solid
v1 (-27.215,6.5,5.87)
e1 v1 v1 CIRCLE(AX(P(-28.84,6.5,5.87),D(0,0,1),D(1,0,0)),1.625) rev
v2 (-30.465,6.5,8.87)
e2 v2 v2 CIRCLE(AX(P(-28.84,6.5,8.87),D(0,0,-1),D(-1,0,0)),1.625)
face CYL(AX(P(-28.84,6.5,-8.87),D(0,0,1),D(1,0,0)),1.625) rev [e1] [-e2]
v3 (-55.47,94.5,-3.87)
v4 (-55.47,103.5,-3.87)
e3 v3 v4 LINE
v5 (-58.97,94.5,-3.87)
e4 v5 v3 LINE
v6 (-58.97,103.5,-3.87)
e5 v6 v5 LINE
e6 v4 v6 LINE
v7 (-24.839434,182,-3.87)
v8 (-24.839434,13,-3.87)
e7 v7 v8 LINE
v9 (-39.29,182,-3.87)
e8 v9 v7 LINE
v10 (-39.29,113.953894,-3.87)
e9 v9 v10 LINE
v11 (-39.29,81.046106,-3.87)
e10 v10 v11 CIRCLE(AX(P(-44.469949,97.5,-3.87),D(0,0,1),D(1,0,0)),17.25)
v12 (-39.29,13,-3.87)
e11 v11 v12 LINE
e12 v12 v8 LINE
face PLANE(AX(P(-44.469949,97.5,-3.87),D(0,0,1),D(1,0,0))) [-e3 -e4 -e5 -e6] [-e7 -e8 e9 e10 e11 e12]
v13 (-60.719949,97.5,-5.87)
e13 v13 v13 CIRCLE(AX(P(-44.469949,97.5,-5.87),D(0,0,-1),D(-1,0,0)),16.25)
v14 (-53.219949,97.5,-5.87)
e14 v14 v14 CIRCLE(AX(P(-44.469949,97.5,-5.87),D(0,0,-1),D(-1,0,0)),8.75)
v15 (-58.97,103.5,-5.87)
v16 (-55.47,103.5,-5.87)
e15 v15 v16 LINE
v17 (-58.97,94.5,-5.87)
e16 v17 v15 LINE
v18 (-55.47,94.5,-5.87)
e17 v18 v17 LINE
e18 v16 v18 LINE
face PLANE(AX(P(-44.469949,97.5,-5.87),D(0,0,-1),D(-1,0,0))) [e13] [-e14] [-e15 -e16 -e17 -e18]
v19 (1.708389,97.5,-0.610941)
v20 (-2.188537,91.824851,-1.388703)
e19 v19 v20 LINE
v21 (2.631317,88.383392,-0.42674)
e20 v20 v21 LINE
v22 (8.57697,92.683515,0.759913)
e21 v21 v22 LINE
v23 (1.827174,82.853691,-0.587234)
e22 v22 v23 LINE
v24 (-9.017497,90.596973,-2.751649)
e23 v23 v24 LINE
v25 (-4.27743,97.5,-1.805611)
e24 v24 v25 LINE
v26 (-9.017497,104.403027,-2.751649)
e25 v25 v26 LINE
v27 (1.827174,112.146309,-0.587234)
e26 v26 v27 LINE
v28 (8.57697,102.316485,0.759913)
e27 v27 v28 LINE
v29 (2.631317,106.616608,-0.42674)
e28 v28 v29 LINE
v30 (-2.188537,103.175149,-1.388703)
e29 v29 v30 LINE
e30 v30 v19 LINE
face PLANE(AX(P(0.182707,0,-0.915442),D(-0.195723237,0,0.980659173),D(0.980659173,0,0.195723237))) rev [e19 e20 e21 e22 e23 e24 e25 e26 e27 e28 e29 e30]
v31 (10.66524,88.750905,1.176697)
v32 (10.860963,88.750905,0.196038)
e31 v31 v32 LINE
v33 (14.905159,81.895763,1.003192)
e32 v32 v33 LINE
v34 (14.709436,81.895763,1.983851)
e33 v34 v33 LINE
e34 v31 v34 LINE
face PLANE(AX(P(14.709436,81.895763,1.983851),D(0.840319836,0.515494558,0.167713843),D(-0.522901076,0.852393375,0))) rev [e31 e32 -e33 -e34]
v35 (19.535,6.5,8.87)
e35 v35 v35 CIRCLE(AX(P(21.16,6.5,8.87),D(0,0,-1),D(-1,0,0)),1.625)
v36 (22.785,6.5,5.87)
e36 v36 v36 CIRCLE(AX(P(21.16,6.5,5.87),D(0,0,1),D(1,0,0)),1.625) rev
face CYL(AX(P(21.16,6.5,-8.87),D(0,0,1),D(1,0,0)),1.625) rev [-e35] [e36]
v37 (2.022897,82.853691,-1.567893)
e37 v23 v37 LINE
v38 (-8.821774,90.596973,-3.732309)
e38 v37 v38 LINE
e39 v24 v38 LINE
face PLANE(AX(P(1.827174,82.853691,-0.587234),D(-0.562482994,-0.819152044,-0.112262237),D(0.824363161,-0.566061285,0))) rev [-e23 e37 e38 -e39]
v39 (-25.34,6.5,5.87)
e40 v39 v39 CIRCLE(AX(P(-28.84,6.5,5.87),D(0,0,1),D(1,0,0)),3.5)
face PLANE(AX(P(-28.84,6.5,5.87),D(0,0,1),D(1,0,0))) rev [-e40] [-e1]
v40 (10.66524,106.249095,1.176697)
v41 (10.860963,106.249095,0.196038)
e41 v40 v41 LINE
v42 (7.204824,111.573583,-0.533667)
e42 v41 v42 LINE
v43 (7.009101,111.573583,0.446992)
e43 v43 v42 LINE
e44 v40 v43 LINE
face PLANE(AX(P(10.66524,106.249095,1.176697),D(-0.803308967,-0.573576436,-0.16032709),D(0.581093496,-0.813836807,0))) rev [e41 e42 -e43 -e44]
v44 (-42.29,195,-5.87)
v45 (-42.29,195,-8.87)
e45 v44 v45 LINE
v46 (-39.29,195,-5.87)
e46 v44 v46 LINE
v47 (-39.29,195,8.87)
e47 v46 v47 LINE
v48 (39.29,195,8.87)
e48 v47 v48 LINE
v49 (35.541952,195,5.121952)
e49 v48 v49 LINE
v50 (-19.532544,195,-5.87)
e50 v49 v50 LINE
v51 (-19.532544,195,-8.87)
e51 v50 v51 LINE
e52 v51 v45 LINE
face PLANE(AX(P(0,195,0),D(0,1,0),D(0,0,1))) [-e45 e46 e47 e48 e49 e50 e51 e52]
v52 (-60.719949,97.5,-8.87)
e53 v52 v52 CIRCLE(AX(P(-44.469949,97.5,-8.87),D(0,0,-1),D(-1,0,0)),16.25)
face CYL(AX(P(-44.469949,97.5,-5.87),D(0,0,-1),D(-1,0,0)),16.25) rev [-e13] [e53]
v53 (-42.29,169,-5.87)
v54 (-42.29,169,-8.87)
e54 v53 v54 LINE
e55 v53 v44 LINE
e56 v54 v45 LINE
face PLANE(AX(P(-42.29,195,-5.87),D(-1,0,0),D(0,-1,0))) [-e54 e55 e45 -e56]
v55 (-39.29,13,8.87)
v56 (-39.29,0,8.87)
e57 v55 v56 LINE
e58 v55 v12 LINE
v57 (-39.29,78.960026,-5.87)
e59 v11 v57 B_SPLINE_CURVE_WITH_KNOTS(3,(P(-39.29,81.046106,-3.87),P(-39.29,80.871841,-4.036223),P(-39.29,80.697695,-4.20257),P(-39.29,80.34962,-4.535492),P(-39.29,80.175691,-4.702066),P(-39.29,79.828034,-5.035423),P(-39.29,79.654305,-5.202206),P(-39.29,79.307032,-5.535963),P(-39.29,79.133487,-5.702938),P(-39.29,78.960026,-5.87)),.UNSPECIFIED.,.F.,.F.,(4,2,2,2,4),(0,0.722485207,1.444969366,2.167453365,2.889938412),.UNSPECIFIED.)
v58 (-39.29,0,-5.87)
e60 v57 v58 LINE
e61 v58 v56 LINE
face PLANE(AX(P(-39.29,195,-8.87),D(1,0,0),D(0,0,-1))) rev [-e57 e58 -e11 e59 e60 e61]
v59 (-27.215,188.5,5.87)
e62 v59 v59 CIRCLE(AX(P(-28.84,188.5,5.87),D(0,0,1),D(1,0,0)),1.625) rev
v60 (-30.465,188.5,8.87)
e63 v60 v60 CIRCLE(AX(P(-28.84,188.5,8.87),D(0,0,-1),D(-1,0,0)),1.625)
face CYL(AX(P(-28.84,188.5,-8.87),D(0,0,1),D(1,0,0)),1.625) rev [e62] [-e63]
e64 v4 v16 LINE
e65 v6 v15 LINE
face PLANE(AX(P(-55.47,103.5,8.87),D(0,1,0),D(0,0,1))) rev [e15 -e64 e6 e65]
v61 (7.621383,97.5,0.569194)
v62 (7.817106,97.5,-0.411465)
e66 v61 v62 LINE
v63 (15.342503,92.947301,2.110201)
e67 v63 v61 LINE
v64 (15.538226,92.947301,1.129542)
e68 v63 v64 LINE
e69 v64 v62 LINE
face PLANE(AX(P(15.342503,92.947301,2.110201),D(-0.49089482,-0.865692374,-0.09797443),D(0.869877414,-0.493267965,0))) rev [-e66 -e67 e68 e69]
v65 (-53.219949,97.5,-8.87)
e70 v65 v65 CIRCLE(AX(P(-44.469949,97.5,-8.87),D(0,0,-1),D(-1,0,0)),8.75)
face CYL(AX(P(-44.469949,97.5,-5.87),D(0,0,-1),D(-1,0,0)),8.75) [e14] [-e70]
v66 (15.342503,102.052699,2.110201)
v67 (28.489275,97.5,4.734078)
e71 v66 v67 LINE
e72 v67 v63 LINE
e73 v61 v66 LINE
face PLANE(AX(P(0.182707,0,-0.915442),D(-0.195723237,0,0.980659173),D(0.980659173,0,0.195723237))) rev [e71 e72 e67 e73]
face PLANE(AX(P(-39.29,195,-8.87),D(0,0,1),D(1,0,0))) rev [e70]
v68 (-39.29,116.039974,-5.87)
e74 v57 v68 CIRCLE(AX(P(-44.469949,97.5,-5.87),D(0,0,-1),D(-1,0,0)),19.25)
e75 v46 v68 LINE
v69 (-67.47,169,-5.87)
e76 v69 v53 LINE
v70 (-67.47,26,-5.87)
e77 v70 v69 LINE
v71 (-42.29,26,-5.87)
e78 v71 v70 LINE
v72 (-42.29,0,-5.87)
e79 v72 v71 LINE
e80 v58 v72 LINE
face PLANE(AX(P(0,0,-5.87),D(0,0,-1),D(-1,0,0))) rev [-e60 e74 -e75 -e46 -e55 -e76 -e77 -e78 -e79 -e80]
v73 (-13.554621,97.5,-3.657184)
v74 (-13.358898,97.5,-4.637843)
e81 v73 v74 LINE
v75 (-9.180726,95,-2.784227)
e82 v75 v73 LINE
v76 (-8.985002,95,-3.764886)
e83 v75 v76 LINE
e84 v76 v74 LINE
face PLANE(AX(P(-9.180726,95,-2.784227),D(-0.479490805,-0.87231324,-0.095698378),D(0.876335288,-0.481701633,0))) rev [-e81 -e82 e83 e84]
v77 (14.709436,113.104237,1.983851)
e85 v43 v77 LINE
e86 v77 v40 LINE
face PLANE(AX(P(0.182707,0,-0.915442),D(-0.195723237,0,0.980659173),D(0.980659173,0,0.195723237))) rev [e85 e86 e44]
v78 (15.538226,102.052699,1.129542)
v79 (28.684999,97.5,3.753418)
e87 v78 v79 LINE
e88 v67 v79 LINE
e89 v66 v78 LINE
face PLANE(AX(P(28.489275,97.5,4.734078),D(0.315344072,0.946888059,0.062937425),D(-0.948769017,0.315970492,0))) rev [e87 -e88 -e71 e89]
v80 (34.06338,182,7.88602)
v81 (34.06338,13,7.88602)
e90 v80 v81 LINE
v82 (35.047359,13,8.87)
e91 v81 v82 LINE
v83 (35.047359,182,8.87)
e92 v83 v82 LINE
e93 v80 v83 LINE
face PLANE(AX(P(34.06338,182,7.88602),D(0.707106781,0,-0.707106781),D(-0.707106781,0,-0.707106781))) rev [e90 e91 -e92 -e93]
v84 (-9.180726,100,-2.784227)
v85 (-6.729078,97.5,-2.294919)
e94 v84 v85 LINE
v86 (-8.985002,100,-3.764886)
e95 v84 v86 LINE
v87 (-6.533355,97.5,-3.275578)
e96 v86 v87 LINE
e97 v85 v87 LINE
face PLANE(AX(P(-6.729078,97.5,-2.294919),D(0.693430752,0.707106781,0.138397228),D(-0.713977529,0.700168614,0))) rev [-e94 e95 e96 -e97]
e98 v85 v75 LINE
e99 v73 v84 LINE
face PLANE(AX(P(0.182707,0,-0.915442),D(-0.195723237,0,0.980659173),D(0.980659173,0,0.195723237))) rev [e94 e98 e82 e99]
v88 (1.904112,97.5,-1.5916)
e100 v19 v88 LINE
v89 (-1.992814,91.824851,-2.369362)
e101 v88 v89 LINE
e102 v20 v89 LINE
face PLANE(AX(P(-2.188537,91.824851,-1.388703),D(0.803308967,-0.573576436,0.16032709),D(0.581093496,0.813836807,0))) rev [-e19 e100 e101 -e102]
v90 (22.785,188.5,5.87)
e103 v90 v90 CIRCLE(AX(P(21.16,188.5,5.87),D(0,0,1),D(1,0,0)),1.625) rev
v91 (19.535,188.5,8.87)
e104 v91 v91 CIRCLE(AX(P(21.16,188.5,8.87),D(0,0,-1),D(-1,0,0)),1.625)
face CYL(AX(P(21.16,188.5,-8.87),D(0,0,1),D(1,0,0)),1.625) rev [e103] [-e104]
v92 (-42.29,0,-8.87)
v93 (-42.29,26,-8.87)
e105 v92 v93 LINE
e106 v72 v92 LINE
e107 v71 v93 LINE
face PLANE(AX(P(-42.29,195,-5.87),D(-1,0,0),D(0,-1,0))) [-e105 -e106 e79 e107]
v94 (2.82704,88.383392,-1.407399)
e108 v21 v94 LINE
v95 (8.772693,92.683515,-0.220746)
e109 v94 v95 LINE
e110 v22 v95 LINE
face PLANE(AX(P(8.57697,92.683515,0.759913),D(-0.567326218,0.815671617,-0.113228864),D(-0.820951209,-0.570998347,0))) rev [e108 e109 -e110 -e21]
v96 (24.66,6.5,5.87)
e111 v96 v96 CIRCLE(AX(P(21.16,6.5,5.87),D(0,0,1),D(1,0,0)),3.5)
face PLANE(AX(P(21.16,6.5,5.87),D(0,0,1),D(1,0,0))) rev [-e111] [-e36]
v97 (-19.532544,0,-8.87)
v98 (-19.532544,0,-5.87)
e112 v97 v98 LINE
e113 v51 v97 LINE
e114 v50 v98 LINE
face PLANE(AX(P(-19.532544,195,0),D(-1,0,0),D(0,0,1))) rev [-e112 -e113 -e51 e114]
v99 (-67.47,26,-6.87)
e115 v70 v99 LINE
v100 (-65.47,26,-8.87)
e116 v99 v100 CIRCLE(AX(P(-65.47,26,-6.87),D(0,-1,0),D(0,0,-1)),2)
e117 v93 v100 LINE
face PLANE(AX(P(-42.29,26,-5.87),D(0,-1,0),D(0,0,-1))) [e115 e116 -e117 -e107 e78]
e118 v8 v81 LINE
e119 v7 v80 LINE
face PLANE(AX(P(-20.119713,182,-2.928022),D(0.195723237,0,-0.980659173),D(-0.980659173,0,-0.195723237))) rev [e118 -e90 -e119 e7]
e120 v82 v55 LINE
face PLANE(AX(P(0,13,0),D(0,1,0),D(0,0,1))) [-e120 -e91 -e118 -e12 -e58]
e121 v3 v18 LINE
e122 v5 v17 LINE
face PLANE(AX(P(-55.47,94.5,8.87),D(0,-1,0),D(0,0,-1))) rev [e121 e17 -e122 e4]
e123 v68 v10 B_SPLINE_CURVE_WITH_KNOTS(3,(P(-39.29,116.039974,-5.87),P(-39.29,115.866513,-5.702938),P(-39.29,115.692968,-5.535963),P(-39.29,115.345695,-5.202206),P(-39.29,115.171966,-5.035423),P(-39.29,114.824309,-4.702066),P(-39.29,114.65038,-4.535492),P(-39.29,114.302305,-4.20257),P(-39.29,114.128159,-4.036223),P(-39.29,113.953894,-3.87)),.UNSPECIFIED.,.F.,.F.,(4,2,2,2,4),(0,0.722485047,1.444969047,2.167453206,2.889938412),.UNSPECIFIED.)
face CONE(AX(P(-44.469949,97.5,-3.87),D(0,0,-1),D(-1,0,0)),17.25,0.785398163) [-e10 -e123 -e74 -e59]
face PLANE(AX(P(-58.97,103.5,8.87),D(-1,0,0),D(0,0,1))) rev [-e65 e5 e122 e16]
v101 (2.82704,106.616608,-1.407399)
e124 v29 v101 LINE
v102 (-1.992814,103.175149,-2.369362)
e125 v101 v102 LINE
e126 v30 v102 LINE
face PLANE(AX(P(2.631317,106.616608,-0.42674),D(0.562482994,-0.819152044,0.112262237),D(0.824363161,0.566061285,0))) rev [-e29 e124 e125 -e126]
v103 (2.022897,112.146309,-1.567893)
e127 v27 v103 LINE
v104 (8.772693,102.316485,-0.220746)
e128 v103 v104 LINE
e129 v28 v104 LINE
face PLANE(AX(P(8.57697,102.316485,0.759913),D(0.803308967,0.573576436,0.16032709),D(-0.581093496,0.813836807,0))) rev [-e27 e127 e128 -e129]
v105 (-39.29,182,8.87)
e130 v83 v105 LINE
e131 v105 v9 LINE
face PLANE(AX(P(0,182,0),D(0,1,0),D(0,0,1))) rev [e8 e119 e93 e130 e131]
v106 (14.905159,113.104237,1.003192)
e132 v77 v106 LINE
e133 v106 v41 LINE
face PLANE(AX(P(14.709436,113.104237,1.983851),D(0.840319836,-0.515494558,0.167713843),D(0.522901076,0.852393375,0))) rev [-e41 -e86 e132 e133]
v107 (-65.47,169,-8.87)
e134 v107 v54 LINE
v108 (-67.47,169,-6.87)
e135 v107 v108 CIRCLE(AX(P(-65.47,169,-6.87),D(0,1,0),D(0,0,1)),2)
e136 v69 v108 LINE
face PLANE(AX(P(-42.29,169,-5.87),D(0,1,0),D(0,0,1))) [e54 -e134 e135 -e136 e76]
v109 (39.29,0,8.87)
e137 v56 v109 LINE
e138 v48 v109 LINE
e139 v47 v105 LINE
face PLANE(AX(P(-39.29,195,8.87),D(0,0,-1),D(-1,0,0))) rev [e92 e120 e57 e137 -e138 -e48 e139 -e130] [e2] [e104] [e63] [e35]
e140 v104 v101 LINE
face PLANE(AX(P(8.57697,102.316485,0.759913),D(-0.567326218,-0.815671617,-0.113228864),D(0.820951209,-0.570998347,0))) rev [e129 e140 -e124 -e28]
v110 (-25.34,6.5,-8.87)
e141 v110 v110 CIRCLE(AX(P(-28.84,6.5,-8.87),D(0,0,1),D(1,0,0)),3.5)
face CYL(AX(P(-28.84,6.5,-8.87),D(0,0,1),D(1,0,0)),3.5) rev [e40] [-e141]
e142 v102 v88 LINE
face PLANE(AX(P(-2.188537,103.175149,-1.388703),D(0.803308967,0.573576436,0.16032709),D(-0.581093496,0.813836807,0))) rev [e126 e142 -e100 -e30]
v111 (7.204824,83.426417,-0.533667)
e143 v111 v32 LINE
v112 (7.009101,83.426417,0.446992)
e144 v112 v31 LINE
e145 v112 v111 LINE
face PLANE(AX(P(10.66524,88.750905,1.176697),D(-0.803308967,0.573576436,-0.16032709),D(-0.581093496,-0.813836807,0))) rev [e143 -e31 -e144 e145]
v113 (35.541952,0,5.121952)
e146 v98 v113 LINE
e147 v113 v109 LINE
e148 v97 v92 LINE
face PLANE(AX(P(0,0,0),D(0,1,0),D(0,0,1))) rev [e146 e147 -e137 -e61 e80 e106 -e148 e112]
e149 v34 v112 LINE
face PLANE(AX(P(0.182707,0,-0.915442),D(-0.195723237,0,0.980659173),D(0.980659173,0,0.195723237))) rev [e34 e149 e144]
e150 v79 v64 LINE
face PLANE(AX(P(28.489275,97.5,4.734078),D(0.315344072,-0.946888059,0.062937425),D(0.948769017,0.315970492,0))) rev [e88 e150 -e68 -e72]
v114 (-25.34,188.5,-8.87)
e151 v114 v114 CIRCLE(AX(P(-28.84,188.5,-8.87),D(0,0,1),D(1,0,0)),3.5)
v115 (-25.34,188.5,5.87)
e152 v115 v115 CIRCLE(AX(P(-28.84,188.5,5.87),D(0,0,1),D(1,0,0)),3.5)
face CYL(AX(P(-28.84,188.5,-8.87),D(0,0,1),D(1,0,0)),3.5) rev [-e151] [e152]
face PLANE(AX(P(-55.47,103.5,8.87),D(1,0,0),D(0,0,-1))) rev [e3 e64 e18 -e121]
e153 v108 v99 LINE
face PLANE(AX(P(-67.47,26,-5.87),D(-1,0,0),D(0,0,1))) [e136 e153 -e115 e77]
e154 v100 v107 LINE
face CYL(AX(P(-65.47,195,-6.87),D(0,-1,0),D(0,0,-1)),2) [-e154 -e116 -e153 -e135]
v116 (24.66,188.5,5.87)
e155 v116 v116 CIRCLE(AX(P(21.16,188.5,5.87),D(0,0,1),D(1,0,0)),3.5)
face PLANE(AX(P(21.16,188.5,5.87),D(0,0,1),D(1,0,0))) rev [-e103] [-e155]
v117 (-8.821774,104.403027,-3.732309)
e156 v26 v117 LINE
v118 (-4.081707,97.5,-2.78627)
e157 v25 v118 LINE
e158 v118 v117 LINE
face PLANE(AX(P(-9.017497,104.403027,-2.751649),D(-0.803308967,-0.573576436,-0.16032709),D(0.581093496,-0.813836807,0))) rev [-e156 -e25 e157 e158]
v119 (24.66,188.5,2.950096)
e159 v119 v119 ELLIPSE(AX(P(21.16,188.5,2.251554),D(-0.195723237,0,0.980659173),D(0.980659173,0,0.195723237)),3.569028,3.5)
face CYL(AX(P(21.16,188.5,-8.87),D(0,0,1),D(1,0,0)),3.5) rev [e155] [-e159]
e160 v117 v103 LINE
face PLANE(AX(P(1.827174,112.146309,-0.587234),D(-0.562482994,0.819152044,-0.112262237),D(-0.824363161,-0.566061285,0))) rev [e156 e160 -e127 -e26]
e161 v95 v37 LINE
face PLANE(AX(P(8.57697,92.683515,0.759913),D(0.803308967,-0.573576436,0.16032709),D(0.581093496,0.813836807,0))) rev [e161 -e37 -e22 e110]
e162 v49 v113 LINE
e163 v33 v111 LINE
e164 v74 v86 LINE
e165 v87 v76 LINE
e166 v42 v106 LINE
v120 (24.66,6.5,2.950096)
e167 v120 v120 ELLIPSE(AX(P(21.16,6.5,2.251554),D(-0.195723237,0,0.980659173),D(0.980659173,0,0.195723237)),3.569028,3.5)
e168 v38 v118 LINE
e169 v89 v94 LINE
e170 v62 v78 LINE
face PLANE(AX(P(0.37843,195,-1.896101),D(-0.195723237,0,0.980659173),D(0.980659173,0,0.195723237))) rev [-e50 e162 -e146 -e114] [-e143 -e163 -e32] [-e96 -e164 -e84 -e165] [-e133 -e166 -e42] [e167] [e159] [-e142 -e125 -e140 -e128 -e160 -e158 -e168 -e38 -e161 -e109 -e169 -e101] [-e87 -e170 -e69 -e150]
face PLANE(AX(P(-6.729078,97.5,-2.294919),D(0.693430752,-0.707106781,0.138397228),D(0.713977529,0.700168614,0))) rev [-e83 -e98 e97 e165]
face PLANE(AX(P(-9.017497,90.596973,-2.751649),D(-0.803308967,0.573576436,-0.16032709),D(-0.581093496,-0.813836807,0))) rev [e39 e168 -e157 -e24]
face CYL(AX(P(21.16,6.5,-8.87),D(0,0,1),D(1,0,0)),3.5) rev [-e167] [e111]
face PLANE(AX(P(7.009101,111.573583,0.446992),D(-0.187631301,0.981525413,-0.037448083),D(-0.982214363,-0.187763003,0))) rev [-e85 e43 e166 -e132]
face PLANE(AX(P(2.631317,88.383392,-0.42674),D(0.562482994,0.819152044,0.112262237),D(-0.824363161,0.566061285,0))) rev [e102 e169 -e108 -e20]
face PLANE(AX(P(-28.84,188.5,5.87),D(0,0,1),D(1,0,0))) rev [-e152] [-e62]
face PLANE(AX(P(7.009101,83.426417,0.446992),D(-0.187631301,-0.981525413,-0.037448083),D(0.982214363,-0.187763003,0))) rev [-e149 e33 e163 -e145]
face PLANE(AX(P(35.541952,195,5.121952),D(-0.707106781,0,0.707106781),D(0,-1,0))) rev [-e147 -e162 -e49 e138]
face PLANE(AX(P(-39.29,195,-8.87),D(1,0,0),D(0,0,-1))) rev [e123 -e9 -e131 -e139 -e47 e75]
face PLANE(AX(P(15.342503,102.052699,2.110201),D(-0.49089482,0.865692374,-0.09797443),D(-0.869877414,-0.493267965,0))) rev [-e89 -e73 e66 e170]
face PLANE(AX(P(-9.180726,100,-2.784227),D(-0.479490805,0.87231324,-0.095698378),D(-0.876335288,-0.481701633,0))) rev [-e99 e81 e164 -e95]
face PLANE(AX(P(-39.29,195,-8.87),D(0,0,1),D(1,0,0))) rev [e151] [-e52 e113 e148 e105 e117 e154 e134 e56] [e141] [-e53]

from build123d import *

# Parameters (mm, degrees)
CROQUIS1_W                 = 78.58
CROQUIS1_H                 = 17.74
SALIENTE_EXTRUIR1_DEPTH    = 195
CORTAR_EXTRUIR1_DEPTH      = 200.116501074
CORTAR_EXTRUIR1_DEPTH_BACK = 200.116501074
CHAFL_N1_SIZE2             = 3.821967962
CHAFL_N1_SIZE              = 3
CROQUIS4_W                 = 3
CROQUIS4_H                 = 195
SALIENTE_EXTRUIR2_DEPTH    = 3
CROQUIS5_W                 = 25.18
CROQUIS5_H                 = 143
SALIENTE_EXTRUIR3_DEPTH    = 3
REDONDEO1_R                = 2
CORTAR_EXTRUIR2_DEPTH      = 208.103617786
CORTAR_EXTRUIR2_DEPTH_BACK = 208.103617786
CROQUIS6_R                 = 1.625
CORTAR_EXTRUIR3_START      = -3
CROQUIS7_R                 = 3.5
CORTAR_EXTRUIR3_DEPTH      = 205.103617786
CROQUIS8_R                 = 16.25
CROQUIS8_R_2               = 8.75
CORTAR_EXTRUIR4_DEPTH      = 3
CROQUIS9_R                 = 17.25
SALIENTE_EXTRUIR4_DEPTH    = 2
CHAFL_N2_SIZE              = 2
CORTAR_EXTRUIR6_DEPTH      = 208.103617786
CORTAR_EXTRUIR6_DEPTH_BACK = 208.103617786
CROQUIS10_W                = 3.5
CROQUIS10_H                = 9
CORTAR_EXTRUIR7_DEPTH      = 1
CORTAR_EXTRUIR8_START      = -13
CORTAR_EXTRUIR8_DEPTH      = 169


with BuildPart() as part:
    # Croquis1 → Saliente-Extruir1 (new body)
    with BuildSketch(Plane(origin=(0, 0, 0), x_dir=(1, 0, 0), z_dir=(0, 1, 0))):
        Rectangle(CROQUIS1_W, CROQUIS1_H)
    extrude(amount=SALIENTE_EXTRUIR1_DEPTH)

    # Croquis2 → Cortar-Extruir1 (cut, two sides: drawn at the far end of the back side and taken through both)
    with BuildSketch(Plane.XZ.offset(-CORTAR_EXTRUIR1_DEPTH_BACK)):
        Polygon((39.29, 5.87), (-19.532543769, -5.87), (-19.532543769, -8.87), (39.29, -8.87), align=None)
    extrude(amount=CORTAR_EXTRUIR1_DEPTH + CORTAR_EXTRUIR1_DEPTH_BACK, mode=Mode.SUBTRACT)

    # Chaflán1
    chafl_n1_edges = [part.edges().sort_by_distance(p)[0] for p in [
        (39.29, 97.5, 5.87),
    ]]
    chafl_n1_side = [part.faces().sort_by_distance(p)[0] for p in [
        (39.29, 97.5, 5.93),
    ]]
    chamfer(chafl_n1_edges, length=CHAFL_N1_SIZE - 0.0001, length2=CHAFL_N1_SIZE2 - 0.0001, reference=chafl_n1_side[0])  # a hair under: the kernel refuses the full size

    # Croquis4 → Saliente-Extruir2 (add)
    with BuildSketch(Plane(origin=(0, 0, -8.87), x_dir=(-1, 0, 0), z_dir=(0, 0, -1))):
        with Locations((40.79, 97.5)):
            Rectangle(CROQUIS4_W, CROQUIS4_H)
    extrude(amount=-SALIENTE_EXTRUIR2_DEPTH)

    # Croquis5 → Saliente-Extruir3 (add)
    with BuildSketch(Plane(origin=(0, 0, -8.87), x_dir=(-1, 0, 0), z_dir=(0, 0, -1))):
        with Locations((54.88, 97.5)):
            Rectangle(CROQUIS5_W, CROQUIS5_H)
    extrude(amount=-SALIENTE_EXTRUIR3_DEPTH)

    # Redondeo1
    redondeo1_edges = [part.edges().sort_by_distance(p)[0] for p in [
        (-67.47, 97.5, -8.87),
    ]]
    fillet(redondeo1_edges, radius=REDONDEO1_R)

    # Croquis6 → Cortar-Extruir2 (cut, two sides: drawn at the far end of the back side and taken through both)
    with BuildSketch(Plane.XY.offset(8.87).offset(-CORTAR_EXTRUIR2_DEPTH_BACK)):
        with Locations((-28.84, 188.5)):
            Circle(CROQUIS6_R)
        with Locations((21.16, 188.5)):
            Circle(CROQUIS6_R)
        with Locations((21.16, 6.5)):
            Circle(CROQUIS6_R)
        with Locations(Location((-28.84, 6.5, 0), (0, 0, 180))):
            Circle(CROQUIS6_R)
    extrude(amount=CORTAR_EXTRUIR2_DEPTH + CORTAR_EXTRUIR2_DEPTH_BACK, mode=Mode.SUBTRACT)

    # Croquis7 → Cortar-Extruir3 (cut, through all)
    with BuildSketch(Plane.XY.offset(8.87).offset(CORTAR_EXTRUIR3_START)):
        with Locations((-28.84, 188.5)):
            Circle(CROQUIS7_R)
        with Locations((21.16, 188.5)):
            Circle(CROQUIS7_R)
        with Locations((-28.84, 6.5)):
            Circle(CROQUIS7_R)
        with Locations((21.16, 6.5)):
            Circle(CROQUIS7_R)
    extrude(amount=-CORTAR_EXTRUIR3_DEPTH, mode=Mode.SUBTRACT)

    # Croquis8 → Cortar-Extruir4 (cut)
    with BuildSketch(Plane(origin=(0, 0, -8.87), x_dir=(-1, 0, 0), z_dir=(0, 0, -1))):
        with Locations((44.469949206, 97.5)):
            Circle(CROQUIS8_R)
        with Locations((44.469949206, 97.5)):
            Circle(CROQUIS8_R_2, mode=Mode.SUBTRACT)
    extrude(amount=-CORTAR_EXTRUIR4_DEPTH, mode=Mode.SUBTRACT)

    # Croquis9 → Saliente-Extruir4 (add)
    with BuildSketch(Plane.XY.offset(-5.87)):
        with Locations((-44.469949206, 97.5)):
            Circle(CROQUIS9_R)
    extrude(amount=SALIENTE_EXTRUIR4_DEPTH)

    # Chaflán2
    chafl_n2_edges = [part.edges().sort_by_distance(p)[0] for p in [
        (-61.719949206, 97.5, -5.87),
    ]]
    chamfer(chafl_n2_edges, length=CHAFL_N2_SIZE - 0.0001)  # a hair under: the kernel refuses the full size

    # Croquis10 → Cortar-Extruir6 (cut, two sides: drawn at the far end of the back side and taken through both)
    with BuildSketch(Plane(origin=(0, 0, -8.87), x_dir=(-1, 0, 0), z_dir=(0, 0, -1)).offset(-CORTAR_EXTRUIR6_DEPTH_BACK)):
        with Locations((57.22, 99)):
            Rectangle(CROQUIS10_W, CROQUIS10_H)
    extrude(amount=CORTAR_EXTRUIR6_DEPTH + CORTAR_EXTRUIR6_DEPTH_BACK, mode=Mode.SUBTRACT)

    # Croquis11 → Cortar-Extruir7 (cut)
    with BuildSketch(Plane(origin=(0.378430223, 0, -1.896101224), x_dir=(-0.9806591733939511, 0, -0.1957232373487947), z_dir=(0.19572323734879468, 0, -0.980659173393951))):
        Polygon((-28.864838216, 97.5), (-15.458781877, 92.947300595), (-7.58538371, 97.5), (-15.458781877, 102.052699405), align=None)
        Polygon((-10.689272405, 88.750905342), (-6.961025568, 83.426417054), (-14.813228871, 81.895762524), align=None)
        Polygon((-8.5598171, 92.683515176), (-1.676899864, 82.853690645), (9.381652734, 90.596972535), (4.548100867, 97.5), (9.381652734, 104.403027465), (-1.676899864, 112.146309355), (-8.5598171, 102.316484824), (-2.496901935, 106.616608043), (2.418010331, 103.175149425), (-1.555772077, 97.5), (2.418010331, 91.824850575), (-2.496901935, 88.383391957), align=None)
        Polygon((7.048100867, 97.5), (9.548100867, 95), (14.008259291, 97.5), (9.548100867, 100), align=None)
        Polygon((-14.813228871, 113.104237476), (-10.689272405, 106.249094658), (-6.961025568, 111.573582946), align=None)
    extrude(amount=-CORTAR_EXTRUIR7_DEPTH, mode=Mode.SUBTRACT)

    # Croquis12 → Cortar-Extruir8 (cut)
    with BuildSketch(Plane.XZ.offset(CORTAR_EXTRUIR8_START)):
        Polygon((-20.119713481, -2.92802248), (-24.839433576, -3.87), (-39.29, -3.87), (-39.29, 8.87), (35.047359313, 8.87), (34.063379787, 7.886020474), align=None)
    extrude(amount=-CORTAR_EXTRUIR8_DEPTH, mode=Mode.SUBTRACT)


solid = part.part
